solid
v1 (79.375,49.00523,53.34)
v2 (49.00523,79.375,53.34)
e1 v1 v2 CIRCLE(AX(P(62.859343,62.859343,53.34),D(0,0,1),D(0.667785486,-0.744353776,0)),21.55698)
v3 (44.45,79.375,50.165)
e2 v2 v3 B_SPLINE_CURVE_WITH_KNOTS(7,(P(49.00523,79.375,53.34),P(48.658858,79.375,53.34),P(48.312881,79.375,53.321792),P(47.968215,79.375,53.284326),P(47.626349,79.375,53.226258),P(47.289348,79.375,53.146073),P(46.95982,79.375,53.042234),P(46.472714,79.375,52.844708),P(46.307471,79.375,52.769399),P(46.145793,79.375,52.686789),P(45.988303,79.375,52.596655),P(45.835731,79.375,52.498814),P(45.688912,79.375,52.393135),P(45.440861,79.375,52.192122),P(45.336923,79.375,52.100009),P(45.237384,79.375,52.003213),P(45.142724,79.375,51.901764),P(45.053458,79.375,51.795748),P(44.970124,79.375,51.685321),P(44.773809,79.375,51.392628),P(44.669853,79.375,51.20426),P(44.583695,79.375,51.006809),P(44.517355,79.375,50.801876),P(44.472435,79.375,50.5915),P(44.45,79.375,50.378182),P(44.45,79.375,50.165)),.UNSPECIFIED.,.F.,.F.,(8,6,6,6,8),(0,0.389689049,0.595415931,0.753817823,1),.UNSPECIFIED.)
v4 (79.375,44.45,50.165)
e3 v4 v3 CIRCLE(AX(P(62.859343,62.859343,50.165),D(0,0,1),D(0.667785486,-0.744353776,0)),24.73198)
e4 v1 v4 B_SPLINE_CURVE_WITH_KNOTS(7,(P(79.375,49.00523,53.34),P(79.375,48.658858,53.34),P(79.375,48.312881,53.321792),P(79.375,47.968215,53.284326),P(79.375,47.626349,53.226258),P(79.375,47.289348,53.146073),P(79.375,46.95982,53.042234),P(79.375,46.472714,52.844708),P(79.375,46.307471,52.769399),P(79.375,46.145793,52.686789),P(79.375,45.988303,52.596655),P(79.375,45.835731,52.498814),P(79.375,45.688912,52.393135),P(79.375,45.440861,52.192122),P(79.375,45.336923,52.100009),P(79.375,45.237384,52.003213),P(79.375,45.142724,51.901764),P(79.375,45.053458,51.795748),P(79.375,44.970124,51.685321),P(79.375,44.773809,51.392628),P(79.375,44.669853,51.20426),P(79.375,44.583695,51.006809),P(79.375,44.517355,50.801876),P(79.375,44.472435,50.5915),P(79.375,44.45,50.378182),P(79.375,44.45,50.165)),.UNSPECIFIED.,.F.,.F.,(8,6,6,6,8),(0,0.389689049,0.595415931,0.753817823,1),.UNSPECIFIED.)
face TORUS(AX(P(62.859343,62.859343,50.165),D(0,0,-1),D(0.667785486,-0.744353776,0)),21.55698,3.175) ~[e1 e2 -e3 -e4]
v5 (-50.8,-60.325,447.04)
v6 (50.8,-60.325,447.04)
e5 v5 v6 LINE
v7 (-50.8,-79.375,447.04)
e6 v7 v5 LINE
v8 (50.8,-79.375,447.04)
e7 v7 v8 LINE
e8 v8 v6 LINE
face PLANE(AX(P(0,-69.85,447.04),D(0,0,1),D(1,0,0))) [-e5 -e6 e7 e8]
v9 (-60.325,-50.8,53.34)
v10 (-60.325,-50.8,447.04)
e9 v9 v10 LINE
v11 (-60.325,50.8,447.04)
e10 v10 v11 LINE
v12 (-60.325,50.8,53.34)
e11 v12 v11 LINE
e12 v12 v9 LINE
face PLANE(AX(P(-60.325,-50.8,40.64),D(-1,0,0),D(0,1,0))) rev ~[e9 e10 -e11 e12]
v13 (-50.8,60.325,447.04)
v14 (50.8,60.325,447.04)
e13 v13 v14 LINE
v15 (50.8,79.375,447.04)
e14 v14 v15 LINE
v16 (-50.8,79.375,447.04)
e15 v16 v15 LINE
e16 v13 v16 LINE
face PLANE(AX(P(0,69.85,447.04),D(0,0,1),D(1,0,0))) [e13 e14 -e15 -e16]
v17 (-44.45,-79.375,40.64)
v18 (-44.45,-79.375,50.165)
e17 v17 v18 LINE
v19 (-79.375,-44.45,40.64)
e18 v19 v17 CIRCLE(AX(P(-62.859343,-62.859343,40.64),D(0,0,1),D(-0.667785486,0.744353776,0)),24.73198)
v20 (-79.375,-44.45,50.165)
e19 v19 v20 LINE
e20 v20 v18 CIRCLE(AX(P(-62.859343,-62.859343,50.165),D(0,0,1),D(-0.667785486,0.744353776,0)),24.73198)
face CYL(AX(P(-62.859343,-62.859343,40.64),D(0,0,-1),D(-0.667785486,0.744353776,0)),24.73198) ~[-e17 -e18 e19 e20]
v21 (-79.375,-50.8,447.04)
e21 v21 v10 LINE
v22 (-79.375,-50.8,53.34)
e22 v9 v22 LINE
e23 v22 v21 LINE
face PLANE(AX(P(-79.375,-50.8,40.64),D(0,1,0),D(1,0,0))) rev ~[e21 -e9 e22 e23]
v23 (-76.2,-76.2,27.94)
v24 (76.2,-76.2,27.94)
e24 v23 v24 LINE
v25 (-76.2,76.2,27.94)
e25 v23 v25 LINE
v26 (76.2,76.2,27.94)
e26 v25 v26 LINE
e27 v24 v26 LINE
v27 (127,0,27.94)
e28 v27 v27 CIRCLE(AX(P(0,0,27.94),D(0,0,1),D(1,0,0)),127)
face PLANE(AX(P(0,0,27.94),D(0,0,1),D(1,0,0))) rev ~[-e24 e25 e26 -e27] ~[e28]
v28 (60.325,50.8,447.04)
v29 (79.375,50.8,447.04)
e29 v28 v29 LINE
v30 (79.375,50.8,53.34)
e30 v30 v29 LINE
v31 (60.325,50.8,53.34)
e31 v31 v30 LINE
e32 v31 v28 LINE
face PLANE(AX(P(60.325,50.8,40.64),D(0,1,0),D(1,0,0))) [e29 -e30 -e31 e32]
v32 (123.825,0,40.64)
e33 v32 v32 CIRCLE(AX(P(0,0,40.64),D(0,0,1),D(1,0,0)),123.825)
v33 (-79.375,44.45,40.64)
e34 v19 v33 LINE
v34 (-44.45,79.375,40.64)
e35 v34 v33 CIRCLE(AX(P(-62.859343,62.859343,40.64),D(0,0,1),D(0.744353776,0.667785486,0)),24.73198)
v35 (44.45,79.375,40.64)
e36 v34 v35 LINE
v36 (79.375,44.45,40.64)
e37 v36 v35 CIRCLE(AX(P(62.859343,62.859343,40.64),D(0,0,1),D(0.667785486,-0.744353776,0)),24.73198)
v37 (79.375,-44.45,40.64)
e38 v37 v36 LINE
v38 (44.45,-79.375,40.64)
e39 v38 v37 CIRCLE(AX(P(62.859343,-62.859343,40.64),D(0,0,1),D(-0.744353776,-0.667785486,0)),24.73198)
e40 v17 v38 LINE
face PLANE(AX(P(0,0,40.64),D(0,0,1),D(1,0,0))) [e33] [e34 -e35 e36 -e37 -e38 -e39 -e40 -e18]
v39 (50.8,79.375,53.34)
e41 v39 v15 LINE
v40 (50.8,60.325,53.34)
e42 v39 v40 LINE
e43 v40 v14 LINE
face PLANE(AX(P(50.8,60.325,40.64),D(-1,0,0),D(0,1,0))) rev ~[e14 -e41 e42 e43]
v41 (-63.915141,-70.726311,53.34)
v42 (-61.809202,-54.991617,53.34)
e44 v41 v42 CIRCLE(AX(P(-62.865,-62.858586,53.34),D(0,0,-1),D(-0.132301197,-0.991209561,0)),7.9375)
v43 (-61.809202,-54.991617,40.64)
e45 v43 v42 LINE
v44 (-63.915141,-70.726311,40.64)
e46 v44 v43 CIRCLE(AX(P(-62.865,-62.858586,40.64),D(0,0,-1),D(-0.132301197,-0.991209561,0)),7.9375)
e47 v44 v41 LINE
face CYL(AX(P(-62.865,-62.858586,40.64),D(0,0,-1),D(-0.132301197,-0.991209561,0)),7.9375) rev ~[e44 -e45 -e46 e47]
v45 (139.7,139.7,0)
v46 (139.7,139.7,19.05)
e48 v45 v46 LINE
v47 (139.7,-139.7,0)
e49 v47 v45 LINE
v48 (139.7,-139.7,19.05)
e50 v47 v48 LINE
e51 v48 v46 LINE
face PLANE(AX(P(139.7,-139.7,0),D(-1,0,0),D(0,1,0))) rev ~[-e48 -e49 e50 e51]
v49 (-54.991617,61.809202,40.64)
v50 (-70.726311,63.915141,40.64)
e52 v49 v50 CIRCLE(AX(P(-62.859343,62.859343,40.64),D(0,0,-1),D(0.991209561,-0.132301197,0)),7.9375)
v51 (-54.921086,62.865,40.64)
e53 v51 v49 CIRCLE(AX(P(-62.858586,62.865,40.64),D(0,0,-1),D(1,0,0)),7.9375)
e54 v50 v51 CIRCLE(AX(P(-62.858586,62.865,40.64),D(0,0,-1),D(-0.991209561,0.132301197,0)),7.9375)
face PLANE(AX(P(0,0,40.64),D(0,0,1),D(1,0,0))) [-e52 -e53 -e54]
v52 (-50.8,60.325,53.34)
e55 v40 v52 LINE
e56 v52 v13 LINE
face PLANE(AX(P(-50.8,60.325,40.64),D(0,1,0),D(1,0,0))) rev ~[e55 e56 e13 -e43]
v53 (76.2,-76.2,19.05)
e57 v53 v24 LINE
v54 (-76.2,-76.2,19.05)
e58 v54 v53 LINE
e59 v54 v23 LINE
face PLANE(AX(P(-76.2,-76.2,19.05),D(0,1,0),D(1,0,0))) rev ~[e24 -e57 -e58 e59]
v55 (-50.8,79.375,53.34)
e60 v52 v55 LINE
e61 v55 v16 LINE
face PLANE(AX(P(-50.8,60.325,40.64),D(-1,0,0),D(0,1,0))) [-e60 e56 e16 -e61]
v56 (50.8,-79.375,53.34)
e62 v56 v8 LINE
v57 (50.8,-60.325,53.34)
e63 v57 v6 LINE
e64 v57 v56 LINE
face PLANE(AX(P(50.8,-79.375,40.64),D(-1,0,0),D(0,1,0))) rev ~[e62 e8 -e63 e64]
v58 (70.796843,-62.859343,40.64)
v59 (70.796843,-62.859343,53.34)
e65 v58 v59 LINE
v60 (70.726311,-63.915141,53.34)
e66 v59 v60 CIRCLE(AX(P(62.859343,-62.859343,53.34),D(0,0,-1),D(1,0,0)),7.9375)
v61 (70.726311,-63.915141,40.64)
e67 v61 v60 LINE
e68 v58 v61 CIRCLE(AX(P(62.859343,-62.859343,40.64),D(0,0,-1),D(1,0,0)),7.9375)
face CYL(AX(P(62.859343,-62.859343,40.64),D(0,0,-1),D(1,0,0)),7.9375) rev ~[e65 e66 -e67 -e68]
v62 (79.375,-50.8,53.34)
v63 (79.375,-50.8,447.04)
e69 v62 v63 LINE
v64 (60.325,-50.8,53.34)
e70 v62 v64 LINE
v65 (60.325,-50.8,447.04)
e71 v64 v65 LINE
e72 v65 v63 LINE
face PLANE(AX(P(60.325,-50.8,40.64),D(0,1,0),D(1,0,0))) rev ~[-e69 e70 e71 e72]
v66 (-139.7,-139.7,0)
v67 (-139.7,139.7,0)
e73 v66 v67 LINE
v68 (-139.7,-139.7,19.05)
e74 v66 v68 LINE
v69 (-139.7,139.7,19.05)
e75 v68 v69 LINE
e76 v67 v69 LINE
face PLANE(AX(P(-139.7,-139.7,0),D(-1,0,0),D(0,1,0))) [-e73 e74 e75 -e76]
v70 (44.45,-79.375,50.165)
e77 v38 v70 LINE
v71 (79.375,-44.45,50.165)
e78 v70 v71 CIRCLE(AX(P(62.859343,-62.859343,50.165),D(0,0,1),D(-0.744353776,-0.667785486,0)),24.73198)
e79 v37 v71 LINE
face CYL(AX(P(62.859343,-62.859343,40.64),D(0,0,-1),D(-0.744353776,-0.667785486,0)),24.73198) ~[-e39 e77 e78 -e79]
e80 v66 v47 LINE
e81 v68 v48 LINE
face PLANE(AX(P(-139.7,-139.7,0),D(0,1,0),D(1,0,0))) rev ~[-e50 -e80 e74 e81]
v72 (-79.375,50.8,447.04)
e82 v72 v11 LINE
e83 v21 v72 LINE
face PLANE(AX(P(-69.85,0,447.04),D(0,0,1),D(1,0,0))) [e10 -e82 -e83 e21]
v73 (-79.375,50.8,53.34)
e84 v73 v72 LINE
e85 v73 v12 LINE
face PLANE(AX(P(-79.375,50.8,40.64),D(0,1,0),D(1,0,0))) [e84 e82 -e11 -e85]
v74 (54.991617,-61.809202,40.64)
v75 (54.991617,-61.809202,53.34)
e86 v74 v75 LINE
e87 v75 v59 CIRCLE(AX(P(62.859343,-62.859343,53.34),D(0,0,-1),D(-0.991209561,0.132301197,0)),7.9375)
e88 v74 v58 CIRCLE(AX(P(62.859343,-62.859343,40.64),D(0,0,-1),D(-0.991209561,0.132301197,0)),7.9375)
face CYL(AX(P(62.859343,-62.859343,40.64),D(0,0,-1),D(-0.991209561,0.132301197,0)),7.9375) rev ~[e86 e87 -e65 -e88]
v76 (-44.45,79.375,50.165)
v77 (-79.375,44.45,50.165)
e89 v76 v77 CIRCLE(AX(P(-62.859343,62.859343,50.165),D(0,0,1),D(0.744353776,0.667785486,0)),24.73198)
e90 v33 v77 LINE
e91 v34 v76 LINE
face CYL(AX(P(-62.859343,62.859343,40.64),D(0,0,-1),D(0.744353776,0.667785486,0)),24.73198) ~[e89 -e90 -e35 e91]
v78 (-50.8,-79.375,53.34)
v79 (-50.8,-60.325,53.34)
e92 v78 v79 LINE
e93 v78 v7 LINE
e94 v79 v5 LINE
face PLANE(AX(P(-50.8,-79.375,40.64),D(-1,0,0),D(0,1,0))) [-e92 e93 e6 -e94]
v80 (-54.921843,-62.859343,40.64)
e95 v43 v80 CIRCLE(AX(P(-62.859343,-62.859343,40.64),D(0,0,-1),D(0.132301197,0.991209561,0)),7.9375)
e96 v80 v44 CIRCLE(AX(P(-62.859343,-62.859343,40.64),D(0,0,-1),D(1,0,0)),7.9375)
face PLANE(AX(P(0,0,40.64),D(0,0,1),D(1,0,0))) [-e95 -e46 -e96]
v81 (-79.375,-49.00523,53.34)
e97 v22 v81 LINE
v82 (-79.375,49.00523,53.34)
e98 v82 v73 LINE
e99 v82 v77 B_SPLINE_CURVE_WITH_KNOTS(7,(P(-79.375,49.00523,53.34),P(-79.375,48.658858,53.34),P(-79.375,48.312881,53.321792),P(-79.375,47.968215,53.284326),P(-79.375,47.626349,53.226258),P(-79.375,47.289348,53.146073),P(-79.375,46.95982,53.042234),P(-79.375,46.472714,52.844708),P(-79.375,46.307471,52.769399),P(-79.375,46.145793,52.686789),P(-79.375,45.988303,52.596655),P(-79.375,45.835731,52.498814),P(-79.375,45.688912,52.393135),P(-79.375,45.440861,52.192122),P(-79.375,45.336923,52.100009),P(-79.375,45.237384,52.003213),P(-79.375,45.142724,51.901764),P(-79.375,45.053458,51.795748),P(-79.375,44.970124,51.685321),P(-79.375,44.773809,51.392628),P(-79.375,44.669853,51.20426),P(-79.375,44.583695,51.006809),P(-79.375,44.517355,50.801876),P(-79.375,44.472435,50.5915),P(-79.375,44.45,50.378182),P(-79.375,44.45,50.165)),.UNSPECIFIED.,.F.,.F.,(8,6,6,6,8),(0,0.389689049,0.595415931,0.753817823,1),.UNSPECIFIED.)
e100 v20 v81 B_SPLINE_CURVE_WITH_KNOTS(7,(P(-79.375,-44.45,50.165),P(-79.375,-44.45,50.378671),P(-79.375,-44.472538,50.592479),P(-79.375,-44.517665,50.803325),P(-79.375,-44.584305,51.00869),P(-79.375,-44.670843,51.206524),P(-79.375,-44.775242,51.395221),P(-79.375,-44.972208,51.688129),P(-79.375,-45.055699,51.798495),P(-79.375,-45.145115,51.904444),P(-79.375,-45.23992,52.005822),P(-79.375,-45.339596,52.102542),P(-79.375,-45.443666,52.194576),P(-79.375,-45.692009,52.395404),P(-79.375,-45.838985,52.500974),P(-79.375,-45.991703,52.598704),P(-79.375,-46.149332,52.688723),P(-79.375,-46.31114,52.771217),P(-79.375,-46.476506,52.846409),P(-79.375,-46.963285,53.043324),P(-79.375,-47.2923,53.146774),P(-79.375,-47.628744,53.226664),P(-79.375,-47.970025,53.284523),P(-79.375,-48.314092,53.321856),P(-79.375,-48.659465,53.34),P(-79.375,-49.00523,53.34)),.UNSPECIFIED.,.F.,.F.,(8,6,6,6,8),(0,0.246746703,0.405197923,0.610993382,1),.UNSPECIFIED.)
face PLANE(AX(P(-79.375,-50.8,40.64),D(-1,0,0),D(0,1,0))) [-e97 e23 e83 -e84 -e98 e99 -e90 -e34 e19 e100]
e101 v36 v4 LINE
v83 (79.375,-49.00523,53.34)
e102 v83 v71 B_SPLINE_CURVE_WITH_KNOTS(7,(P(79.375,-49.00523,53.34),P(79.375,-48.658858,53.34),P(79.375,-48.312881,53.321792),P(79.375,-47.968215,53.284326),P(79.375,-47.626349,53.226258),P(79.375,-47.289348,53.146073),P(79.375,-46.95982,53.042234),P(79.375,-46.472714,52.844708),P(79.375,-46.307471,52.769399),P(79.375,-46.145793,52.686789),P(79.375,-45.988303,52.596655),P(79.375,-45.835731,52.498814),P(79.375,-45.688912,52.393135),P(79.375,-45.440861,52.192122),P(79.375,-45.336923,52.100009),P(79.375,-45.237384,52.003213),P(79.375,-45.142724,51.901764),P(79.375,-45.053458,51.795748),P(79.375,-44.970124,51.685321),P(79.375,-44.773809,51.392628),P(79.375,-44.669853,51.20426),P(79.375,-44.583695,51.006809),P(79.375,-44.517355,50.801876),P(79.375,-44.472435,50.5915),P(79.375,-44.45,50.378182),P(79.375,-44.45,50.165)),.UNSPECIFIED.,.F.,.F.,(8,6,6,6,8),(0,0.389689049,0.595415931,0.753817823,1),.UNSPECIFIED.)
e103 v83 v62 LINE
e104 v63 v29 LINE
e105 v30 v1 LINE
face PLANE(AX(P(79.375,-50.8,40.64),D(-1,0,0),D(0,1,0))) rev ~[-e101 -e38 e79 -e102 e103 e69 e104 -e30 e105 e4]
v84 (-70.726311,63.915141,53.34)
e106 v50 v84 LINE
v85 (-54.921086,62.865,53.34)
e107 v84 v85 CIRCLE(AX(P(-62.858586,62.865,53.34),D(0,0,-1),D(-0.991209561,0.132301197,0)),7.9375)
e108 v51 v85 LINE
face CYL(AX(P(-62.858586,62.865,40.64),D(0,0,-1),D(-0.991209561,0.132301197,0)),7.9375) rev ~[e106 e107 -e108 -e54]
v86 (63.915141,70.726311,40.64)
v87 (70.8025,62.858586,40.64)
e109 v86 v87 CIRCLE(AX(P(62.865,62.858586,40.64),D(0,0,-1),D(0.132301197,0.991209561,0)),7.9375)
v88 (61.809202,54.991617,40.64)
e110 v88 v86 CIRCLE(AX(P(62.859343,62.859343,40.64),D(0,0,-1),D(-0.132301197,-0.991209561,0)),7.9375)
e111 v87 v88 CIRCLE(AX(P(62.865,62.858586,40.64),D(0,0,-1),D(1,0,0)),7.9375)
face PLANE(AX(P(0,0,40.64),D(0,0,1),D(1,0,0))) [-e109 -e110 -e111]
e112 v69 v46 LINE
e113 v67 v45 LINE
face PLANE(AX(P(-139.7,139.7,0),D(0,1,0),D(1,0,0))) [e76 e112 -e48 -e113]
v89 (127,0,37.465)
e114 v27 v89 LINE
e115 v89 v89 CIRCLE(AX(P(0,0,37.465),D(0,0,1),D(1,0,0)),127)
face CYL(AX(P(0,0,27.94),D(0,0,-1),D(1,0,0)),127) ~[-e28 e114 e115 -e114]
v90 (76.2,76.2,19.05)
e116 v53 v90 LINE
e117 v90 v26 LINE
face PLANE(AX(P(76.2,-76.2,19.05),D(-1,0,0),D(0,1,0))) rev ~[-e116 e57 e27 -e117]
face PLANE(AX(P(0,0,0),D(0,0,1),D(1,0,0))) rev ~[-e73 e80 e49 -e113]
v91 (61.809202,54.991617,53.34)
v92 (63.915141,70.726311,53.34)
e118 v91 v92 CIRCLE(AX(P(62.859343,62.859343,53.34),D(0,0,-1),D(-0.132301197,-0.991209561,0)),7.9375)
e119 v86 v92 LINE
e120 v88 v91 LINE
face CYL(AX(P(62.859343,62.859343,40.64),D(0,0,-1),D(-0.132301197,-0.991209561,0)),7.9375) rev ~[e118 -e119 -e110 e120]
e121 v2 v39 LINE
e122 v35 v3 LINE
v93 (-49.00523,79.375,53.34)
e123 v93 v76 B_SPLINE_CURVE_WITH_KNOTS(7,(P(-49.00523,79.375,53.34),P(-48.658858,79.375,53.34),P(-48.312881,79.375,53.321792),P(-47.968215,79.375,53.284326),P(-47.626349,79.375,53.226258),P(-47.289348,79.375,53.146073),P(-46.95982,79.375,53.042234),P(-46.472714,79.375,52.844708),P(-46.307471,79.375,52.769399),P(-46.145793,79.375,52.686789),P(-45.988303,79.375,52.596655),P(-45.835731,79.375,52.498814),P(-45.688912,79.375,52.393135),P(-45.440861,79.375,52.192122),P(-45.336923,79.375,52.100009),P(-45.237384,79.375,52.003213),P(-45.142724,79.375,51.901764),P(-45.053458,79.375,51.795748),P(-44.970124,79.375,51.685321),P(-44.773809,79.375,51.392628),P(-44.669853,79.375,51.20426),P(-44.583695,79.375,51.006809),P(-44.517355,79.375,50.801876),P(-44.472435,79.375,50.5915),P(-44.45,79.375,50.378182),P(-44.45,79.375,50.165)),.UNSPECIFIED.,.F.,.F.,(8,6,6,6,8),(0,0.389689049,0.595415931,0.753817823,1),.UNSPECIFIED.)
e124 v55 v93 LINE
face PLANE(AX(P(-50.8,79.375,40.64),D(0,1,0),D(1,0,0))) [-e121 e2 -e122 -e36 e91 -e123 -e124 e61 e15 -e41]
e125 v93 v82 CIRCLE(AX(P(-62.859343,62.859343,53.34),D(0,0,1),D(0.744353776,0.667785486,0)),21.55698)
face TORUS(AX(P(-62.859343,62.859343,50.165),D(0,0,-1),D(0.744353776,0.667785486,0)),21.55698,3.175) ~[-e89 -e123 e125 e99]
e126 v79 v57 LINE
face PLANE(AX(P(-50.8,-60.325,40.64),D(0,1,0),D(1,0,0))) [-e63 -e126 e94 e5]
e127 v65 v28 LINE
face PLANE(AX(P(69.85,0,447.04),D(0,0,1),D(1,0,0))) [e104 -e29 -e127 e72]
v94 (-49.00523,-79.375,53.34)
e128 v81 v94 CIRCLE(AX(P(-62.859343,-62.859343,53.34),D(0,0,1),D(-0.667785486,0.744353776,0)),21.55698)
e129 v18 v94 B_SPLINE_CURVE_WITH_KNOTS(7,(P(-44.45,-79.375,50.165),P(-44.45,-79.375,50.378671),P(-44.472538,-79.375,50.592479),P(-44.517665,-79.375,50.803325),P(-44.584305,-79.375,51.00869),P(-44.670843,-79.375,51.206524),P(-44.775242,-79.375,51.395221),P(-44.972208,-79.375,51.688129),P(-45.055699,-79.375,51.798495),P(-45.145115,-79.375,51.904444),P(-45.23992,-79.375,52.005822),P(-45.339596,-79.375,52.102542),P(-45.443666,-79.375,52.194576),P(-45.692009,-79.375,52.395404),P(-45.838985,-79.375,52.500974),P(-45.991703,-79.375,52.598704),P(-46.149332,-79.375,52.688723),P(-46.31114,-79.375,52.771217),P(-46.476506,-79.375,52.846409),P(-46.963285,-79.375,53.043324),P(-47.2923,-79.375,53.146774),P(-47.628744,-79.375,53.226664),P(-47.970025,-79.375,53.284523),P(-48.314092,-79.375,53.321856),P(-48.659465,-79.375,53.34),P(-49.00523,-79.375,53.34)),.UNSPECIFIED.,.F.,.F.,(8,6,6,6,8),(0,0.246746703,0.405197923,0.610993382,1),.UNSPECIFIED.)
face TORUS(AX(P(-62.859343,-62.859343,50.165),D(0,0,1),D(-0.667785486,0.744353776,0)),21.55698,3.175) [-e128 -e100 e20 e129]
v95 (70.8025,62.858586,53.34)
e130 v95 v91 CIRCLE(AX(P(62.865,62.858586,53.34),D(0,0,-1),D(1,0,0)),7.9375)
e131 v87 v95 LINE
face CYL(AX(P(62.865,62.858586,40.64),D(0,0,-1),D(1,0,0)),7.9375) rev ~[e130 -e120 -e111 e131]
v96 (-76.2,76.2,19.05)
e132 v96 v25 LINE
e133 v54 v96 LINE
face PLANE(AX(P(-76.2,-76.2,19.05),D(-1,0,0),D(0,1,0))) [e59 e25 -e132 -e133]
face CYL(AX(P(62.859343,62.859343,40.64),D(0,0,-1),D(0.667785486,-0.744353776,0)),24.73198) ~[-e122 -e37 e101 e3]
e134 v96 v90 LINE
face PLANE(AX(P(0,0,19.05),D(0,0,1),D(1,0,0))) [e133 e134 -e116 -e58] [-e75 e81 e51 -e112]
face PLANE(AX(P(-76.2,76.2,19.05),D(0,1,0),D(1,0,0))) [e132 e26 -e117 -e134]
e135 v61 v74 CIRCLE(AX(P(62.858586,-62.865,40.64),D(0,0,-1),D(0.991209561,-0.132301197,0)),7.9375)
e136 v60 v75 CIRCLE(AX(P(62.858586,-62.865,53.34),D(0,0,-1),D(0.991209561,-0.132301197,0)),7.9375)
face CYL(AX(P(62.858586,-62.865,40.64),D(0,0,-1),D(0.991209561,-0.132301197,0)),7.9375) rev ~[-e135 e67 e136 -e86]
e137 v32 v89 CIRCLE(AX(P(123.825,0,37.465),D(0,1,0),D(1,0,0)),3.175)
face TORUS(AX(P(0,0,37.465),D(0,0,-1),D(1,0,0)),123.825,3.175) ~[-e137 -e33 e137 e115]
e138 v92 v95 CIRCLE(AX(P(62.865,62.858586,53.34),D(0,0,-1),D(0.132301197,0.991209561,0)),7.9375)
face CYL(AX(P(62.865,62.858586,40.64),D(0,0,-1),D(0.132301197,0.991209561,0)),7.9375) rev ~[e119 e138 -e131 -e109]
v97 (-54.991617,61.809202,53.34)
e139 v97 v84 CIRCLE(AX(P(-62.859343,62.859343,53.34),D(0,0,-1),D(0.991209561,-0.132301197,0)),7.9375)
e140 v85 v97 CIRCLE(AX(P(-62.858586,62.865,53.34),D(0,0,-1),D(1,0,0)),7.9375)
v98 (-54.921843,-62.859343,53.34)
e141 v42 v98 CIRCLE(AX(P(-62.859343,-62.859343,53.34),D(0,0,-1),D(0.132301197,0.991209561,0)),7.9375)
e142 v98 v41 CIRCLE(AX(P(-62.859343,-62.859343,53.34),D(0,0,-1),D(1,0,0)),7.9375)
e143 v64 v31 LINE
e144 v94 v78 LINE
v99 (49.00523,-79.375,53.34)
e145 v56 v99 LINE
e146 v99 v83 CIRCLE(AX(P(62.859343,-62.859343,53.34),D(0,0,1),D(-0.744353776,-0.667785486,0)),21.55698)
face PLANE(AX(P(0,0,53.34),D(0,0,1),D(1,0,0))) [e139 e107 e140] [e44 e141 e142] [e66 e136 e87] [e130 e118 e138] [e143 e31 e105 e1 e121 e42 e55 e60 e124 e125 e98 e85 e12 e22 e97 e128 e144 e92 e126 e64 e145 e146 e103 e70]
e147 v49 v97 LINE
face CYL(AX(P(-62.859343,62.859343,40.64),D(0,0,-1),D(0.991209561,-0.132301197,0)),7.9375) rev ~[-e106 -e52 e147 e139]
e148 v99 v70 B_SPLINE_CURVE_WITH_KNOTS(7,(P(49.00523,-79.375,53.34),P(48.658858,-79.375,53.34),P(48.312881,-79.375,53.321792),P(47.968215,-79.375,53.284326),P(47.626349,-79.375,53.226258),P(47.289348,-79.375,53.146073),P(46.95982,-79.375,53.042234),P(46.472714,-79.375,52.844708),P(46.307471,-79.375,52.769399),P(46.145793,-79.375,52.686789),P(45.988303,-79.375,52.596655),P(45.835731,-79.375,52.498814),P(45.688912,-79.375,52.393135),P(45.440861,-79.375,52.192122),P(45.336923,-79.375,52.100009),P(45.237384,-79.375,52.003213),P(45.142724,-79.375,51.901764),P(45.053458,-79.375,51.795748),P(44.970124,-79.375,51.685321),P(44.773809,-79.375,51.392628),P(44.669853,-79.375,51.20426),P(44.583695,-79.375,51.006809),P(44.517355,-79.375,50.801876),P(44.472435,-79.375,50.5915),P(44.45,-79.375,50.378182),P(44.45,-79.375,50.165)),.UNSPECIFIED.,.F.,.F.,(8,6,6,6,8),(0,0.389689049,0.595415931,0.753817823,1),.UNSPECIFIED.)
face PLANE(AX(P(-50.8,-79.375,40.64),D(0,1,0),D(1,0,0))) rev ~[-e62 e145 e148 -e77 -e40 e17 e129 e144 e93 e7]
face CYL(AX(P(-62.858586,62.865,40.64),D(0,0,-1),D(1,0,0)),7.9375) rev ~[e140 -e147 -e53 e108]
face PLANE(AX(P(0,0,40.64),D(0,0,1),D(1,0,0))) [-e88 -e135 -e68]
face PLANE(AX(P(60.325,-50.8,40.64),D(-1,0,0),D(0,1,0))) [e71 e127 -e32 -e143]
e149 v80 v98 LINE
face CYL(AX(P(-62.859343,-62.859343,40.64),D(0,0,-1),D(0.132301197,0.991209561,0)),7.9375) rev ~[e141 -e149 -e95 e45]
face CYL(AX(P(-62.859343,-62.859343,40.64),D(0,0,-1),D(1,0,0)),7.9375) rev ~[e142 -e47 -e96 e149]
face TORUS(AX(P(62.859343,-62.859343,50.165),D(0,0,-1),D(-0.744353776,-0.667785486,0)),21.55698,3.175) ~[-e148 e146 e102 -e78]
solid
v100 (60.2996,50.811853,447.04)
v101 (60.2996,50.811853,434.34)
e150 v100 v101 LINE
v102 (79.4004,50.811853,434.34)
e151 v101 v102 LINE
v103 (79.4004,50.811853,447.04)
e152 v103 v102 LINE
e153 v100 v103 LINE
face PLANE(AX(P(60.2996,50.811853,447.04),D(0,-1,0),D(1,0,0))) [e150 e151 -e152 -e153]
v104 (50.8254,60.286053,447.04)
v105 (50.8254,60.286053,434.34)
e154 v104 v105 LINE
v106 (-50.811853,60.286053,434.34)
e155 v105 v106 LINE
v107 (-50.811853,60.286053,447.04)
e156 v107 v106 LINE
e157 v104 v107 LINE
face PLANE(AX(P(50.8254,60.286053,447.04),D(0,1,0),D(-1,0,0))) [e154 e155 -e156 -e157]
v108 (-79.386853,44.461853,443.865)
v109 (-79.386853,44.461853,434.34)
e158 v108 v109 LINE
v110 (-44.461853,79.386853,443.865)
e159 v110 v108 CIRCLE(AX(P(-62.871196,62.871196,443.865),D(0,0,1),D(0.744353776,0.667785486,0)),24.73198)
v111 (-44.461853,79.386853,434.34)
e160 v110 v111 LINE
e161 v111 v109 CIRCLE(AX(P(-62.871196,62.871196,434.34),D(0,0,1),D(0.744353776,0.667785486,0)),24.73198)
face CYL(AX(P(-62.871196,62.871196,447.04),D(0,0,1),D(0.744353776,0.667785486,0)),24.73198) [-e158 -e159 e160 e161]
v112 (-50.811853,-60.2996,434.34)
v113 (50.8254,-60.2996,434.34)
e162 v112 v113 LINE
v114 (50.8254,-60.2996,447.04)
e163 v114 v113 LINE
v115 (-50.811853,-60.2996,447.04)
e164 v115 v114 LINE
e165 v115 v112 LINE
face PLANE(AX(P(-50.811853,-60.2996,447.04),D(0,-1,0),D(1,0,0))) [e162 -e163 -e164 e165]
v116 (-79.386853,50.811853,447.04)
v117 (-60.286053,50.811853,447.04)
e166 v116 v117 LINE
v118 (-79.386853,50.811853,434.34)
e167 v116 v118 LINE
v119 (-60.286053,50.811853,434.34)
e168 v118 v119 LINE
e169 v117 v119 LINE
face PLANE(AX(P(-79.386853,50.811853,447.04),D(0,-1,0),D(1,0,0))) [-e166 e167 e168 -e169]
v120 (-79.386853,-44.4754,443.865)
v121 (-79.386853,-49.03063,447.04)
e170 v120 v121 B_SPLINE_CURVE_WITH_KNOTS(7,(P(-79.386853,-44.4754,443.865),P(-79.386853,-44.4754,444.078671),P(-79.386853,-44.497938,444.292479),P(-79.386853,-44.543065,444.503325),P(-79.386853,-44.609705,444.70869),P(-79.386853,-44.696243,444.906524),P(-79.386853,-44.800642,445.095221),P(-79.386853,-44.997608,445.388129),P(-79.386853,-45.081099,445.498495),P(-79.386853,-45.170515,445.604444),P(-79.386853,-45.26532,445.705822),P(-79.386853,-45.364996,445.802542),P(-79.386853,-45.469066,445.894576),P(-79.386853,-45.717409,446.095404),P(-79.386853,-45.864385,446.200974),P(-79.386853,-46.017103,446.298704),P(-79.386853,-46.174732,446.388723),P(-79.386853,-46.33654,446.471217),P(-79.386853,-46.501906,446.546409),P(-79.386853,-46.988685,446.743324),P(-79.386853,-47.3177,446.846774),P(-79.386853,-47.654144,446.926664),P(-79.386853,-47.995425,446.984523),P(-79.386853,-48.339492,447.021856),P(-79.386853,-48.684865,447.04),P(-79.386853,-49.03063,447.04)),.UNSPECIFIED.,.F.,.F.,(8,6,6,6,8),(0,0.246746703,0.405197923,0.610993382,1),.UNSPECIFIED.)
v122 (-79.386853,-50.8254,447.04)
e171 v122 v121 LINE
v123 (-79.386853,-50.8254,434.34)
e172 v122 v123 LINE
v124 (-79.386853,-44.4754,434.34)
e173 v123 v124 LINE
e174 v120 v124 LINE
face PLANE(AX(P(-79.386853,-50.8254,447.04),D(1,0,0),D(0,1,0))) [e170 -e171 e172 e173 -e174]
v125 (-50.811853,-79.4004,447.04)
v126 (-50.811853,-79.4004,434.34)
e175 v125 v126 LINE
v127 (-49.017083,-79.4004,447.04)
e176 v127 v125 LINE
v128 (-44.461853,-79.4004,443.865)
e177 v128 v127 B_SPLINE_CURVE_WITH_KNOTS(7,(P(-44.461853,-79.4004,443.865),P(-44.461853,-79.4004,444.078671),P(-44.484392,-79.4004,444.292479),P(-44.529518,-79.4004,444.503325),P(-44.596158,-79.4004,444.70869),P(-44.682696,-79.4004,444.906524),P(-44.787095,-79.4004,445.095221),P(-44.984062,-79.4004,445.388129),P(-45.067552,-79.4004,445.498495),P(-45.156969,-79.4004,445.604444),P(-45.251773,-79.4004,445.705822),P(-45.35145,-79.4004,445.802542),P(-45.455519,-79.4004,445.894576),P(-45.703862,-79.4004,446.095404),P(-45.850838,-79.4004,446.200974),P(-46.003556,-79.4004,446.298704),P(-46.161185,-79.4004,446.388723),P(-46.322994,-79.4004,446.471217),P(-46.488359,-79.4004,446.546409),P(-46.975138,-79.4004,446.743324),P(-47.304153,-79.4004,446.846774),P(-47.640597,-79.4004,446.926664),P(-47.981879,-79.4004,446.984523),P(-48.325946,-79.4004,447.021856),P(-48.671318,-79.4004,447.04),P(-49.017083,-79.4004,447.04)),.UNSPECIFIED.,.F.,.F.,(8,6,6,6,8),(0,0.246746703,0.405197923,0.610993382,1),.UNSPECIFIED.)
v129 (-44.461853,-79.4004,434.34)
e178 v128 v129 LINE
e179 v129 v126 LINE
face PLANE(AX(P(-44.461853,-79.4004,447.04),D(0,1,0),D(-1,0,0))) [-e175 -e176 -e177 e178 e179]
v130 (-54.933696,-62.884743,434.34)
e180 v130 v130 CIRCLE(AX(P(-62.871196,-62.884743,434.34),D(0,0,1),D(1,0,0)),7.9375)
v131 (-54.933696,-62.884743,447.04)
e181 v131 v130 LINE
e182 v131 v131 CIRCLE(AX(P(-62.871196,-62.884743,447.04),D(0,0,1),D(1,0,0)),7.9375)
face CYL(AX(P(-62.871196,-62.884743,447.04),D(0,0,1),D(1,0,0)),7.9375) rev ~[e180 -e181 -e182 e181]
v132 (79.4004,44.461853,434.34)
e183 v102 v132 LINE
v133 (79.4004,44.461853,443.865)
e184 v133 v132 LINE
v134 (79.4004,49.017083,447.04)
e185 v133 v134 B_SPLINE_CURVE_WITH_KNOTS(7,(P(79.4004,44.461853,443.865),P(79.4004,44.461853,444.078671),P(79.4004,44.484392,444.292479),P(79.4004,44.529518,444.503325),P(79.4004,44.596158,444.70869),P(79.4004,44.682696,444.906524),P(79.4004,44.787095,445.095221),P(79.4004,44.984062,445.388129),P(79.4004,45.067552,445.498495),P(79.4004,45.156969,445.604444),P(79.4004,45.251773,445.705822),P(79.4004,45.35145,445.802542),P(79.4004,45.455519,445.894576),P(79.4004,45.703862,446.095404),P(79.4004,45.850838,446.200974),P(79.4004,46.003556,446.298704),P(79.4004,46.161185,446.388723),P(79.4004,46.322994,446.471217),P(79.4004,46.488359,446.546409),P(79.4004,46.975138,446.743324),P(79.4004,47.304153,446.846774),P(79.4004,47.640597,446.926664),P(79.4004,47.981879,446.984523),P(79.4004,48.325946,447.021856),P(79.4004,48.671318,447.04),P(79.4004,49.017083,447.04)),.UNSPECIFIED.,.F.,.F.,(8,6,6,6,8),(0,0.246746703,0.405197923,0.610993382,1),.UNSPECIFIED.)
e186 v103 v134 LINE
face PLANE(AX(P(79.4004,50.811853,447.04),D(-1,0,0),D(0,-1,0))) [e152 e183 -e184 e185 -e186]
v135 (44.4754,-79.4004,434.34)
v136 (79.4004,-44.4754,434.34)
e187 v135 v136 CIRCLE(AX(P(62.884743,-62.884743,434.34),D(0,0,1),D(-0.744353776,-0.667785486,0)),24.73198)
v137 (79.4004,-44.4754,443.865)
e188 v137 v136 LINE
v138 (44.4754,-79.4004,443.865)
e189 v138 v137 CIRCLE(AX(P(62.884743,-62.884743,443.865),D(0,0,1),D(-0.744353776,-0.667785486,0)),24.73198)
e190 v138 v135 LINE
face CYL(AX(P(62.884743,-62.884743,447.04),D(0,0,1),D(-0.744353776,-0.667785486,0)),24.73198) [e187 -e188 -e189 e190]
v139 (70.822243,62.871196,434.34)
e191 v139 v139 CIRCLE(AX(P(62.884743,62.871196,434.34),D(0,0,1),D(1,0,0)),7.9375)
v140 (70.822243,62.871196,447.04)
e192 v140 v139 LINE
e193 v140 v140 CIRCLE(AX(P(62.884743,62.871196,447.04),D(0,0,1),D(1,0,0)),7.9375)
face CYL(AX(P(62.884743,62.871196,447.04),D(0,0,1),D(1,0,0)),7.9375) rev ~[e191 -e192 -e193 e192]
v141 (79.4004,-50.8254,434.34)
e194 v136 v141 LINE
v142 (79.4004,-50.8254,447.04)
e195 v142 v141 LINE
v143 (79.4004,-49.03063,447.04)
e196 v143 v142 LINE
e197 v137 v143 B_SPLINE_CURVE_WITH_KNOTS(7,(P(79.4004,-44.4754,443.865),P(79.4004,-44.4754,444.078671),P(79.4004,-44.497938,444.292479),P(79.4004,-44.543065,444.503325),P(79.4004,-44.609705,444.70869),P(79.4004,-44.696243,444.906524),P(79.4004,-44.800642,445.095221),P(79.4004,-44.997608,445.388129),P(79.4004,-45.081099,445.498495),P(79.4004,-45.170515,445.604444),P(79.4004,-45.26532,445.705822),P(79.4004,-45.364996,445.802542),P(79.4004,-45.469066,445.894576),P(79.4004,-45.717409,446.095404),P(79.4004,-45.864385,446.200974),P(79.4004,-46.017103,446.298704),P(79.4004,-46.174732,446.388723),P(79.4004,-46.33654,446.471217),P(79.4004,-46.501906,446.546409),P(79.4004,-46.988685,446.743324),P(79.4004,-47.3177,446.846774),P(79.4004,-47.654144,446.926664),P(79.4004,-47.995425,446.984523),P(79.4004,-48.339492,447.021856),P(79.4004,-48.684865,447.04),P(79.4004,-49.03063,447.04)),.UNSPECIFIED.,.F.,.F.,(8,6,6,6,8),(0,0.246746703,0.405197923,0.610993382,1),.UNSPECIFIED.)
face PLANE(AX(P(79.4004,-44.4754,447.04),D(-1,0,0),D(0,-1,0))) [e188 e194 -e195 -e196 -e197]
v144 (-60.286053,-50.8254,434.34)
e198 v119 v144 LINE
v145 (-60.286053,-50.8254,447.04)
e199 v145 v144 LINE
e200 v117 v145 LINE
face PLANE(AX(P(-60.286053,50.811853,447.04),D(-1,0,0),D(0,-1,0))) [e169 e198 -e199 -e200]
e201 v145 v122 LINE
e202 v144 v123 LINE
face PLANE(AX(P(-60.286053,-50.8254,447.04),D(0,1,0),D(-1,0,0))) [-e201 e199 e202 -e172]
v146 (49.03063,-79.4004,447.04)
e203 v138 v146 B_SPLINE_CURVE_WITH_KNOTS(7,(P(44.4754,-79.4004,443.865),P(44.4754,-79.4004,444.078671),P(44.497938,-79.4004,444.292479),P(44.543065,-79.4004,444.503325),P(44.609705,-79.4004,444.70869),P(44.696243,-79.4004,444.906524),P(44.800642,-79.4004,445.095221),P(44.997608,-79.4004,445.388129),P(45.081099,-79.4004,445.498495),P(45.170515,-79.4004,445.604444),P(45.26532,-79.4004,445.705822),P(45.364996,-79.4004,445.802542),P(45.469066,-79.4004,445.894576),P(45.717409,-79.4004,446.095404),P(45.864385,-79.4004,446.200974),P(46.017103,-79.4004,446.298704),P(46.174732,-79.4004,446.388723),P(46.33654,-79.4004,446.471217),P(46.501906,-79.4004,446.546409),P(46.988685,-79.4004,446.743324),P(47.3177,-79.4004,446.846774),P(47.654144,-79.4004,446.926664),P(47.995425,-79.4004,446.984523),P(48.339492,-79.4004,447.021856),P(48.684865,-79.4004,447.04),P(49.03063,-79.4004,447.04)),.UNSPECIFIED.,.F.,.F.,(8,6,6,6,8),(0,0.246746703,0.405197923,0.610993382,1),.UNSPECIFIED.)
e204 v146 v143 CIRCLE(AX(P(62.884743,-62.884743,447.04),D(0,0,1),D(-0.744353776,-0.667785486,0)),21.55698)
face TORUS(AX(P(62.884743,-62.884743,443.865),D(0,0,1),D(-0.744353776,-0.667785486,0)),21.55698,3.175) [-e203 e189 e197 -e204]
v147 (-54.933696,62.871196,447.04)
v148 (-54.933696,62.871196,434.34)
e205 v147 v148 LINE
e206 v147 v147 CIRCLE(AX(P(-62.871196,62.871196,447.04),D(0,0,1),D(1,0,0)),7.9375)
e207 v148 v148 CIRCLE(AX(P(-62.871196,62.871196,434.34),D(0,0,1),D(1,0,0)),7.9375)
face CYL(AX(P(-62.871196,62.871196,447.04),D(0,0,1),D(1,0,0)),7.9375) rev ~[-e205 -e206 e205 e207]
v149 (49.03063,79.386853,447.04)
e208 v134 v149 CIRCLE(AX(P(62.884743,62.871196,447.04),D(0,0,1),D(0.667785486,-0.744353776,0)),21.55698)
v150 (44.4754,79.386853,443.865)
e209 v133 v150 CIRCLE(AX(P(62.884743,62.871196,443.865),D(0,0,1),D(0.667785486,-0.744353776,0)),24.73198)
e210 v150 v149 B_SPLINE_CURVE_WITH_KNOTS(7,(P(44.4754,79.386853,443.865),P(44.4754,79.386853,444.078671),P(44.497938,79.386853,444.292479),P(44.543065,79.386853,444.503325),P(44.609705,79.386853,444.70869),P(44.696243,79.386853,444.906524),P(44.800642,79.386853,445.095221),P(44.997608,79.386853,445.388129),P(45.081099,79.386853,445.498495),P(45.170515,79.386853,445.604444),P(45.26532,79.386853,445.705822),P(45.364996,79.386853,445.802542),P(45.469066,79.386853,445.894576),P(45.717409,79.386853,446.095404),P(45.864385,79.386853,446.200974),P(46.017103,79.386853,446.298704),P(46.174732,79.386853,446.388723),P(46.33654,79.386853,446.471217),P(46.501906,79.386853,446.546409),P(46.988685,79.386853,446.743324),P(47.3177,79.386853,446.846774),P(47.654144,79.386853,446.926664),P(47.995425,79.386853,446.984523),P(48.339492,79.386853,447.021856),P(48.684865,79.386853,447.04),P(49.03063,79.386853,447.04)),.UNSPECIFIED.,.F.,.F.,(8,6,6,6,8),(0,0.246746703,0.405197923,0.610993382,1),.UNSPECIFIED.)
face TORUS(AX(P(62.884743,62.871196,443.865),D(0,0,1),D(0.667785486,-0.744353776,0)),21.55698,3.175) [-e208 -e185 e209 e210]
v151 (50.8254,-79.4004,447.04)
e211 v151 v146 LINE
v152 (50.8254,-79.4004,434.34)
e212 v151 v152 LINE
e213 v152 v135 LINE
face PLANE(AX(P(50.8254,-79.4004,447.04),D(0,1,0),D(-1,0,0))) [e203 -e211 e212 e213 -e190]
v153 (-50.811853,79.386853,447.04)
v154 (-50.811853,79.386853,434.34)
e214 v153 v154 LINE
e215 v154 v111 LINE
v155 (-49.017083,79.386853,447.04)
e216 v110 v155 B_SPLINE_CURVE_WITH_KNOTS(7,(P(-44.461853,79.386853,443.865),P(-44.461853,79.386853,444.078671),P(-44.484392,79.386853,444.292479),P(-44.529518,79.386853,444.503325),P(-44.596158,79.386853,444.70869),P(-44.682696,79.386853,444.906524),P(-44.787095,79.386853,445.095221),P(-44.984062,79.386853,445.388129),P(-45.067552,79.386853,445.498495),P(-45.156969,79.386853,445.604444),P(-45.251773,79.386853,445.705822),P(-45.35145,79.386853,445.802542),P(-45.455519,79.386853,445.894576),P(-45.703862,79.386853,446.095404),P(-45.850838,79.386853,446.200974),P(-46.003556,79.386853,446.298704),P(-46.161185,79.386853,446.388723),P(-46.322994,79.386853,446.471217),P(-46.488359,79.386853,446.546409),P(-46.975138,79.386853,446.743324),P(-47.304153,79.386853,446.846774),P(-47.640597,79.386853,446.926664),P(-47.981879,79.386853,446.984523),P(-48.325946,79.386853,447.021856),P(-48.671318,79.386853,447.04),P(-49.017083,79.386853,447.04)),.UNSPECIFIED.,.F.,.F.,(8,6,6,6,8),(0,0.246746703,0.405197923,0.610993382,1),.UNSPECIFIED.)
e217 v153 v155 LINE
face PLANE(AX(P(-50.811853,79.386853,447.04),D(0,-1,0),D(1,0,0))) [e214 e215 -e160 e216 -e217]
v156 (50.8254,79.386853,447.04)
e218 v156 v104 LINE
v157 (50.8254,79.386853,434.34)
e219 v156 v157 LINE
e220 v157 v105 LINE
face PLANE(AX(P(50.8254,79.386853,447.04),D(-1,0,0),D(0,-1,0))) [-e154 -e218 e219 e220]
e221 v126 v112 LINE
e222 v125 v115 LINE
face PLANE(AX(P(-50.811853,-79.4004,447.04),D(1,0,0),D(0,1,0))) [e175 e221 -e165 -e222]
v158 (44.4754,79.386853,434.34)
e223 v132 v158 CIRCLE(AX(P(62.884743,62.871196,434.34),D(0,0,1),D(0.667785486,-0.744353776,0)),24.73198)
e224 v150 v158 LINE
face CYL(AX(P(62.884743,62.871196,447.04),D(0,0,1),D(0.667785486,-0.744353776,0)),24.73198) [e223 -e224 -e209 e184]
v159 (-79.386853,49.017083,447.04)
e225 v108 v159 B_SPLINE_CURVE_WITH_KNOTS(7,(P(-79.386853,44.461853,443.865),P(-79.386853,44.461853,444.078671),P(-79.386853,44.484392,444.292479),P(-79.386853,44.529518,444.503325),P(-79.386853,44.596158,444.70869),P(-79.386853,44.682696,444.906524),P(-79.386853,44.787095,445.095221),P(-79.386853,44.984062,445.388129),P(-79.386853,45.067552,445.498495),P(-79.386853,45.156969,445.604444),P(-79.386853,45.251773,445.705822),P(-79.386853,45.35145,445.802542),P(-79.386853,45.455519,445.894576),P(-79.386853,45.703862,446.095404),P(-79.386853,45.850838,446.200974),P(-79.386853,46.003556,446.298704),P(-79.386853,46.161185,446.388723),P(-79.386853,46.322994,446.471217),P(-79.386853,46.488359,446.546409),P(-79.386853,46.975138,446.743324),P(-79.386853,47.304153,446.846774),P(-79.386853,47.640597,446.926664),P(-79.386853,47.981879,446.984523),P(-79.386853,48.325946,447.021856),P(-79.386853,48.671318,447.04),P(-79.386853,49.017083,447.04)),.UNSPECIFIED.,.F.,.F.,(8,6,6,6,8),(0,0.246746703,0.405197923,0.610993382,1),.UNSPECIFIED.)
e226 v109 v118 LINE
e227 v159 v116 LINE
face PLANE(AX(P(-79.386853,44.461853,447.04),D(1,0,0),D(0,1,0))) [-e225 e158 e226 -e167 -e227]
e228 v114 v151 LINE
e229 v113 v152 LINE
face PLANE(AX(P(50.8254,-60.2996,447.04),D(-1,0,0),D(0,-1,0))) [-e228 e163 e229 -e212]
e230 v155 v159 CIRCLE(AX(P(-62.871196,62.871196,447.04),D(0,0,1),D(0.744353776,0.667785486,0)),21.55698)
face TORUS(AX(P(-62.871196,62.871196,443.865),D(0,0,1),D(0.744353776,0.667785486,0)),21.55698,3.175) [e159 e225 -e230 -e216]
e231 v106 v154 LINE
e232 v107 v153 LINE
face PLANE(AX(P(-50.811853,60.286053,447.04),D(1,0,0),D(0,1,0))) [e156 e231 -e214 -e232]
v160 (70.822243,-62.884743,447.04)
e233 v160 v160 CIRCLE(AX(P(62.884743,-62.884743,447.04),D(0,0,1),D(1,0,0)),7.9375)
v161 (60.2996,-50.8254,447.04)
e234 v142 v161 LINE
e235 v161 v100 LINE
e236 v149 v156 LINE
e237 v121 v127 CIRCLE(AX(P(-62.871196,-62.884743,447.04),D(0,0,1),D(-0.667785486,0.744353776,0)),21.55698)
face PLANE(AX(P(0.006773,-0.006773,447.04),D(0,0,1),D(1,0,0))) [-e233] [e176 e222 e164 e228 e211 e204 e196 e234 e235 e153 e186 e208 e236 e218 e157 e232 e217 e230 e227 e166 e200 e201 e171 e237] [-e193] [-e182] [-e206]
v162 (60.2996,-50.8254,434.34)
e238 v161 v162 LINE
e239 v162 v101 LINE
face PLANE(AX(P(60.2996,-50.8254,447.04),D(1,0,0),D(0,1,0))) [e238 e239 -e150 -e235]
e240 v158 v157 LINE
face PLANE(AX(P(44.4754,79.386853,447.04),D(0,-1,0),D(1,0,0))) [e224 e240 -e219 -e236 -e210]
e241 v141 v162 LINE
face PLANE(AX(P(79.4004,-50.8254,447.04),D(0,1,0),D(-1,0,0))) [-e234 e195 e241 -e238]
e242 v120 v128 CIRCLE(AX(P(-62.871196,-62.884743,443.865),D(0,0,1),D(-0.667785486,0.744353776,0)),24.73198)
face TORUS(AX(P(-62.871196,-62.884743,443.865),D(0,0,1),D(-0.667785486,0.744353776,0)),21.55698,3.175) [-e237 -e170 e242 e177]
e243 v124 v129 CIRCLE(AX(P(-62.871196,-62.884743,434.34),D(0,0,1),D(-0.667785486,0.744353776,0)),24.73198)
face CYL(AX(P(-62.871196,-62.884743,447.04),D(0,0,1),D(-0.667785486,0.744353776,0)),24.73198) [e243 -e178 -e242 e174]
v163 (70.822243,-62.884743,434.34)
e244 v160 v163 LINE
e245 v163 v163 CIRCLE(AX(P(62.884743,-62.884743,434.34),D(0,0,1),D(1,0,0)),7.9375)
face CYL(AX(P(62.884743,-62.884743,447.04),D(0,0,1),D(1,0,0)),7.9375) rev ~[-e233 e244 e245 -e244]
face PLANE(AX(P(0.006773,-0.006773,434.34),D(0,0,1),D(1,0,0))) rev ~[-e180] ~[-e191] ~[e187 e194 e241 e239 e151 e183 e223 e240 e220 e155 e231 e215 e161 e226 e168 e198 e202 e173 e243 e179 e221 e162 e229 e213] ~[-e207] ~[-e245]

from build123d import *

# Parameters (mm, degrees)
F0_W      = 279.4
F0_H      = 279.4
F1_DEPTH  = 19.05
F2_W      = 152.4
F2_H      = 152.4
F3_DEPTH  = 8.89
F5_R      = 127
F6_DEPTH  = 12.7
F7_W      = 101.6
F7_H      = 19.05
F7_W_2    = 19.05
F7_H_2    = 101.6
F8_DEPTH  = 406.4
F21_DEPTH = 12.7
F22_R     = 3.175
F24_R     = 7.9375
F25_DEPTH = 12.7
F26_R     = 3.175
F27_R     = 3.175


# Not quite as in the source:
# - the program builds the solid bodies; features that only make, move or delete a surface that nothing else refers to are left out


with BuildPart() as f1:
    # F0 (on Top) → F1 (new body)
    with BuildSketch(Plane.XY):
        Rectangle(F0_W, F0_H)
    extrude(amount=F1_DEPTH)

    # F2 (on face) → F3 (join)
    with BuildSketch(Plane.XY.offset(19.05)):
        Rectangle(F2_W, F2_H)
    extrude(amount=F3_DEPTH)

    # F5 (on offset) → F6 (join)
    with BuildSketch(Plane.XY.offset(27.94)):
        Circle(F5_R)
    extrude(amount=F6_DEPTH)

    # F7 (on face) → F8 (join)
    with BuildSketch(Plane.XY.offset(40.64)):
        with Locations((0, -69.85)):
            Rectangle(F7_W, F7_H)
        with Locations((-69.85, 0)):
            Rectangle(F7_W_2, F7_H_2)
        with Locations((0, 69.85)):
            Rectangle(F7_W, F7_H)
        with Locations((69.85, 0)):
            Rectangle(F7_W_2, F7_H_2)
    extrude(amount=F8_DEPTH)

    # F20 (on face) → F21 (join)
    with BuildSketch(Plane.XY.offset(40.64)):
        with BuildLine():
            Line((-50.8, -60.325), (0, -60.325))
            Line((0, -60.325), (50.8, -60.325))
            Line((50.8, -60.325), (50.8, -79.375))
            Line((50.8, -79.375), (44.45, -79.375))
            ThreePointArc((44.45, -79.375), (80.3474934763, -80.3474934763), (79.375, -44.45))
            Line((79.375, -44.45), (79.375, -50.8))
            Line((79.375, -50.8), (60.325, -50.8))
            Line((60.325, -50.8), (60.325, 0))
            Line((60.325, 0), (60.325, 50.8))
            Line((60.325, 50.8), (79.375, 50.8))
            Line((79.375, 50.8), (79.375, 44.45))
            ThreePointArc((79.375, 44.45), (80.3474934763, 80.3474934763), (44.45, 79.375))
            Line((44.45, 79.375), (50.8, 79.375))
            Line((50.8, 79.375), (50.8, 60.325))
            Line((50.8, 60.325), (0, 60.325))
            Line((0, 60.325), (-50.8, 60.325))
            Line((-50.8, 60.325), (-50.8, 79.375))
            Line((-50.8, 79.375), (-44.45, 79.375))
            ThreePointArc((-44.45, 79.375), (-80.3474934763, 80.3474934763), (-79.375, 44.45))
            Line((-79.375, 44.45), (-79.375, 50.8))
            Line((-79.375, 50.8), (-60.325, 50.8))
            Line((-60.325, 50.8), (-60.325, 0))
            Line((-60.325, 0), (-60.325, -50.8))
            Line((-60.325, -50.8), (-79.375, -50.8))
            Line((-79.375, -50.8), (-79.375, -44.45))
            ThreePointArc((-79.375, -44.45), (-80.3474934763, -80.3474934763), (-44.45, -79.375))
            Line((-44.45, -79.375), (-50.8, -79.375))
            Line((-50.8, -79.375), (-50.8, -60.325))
        make_face()
        with BuildLine():
            ThreePointArc((-61.8092019554, -54.9916168178), (-56.8869311974, -57.6311301033), (-54.9218427062, -62.8593427062))
            ThreePointArc((-54.9218427062, -62.8593427062), (-57.6332777778, -68.8336335942), (-63.9151407508, -70.7263114196))
            ThreePointArc((-63.9151407508, -70.7263114196), (-70.7323478094, -61.8056160656), (-61.8092019554, -54.9916168178))
        make_face(mode=Mode.SUBTRACT)
        with BuildLine():
            ThreePointArc((54.9916168179, -61.8092019554), (63.3855707991, -54.9393054434), (70.7968427062, -62.8593427062))
            ThreePointArc((70.7968427062, -62.8593427062), (70.7791902556, -63.3884183561), (70.7263114196, -63.9151407508))
            ThreePointArc((70.7263114196, -63.9151407508), (61.8056160655, -70.7323478094), (54.9916168179, -61.8092019554))
        make_face(mode=Mode.SUBTRACT)
        with BuildLine():
            ThreePointArc((-54.9916168179, 61.8092019554), (-63.912312172, 54.9919948968), (-70.7263114196, 63.9151407508))
            ThreePointArc((-70.7263114196, 63.9151407508), (-62.3323574384, 70.7850372628), (-54.9210855313, 62.865))
            ThreePointArc((-54.9210855313, 62.865), (-54.9387379819, 62.3359243501), (-54.9916168179, 61.8092019554))
        make_face(mode=Mode.SUBTRACT)
        with BuildLine():
            ThreePointArc((61.8092019553, 54.9916168179), (54.9919948968, 63.912312172), (63.9151407508, 70.7263114196))
            ThreePointArc((63.9151407508, 70.7263114196), (68.8374115088, 68.0867981341), (70.8025, 62.8585855313))
            ThreePointArc((70.8025, 62.8585855313), (68.0910649283, 56.8842946433), (61.8092019553, 54.9916168179))
        make_face(mode=Mode.SUBTRACT)
    extrude(amount=F21_DEPTH)

    # F22
    f22_edges = [f1.edges().sort_by_distance(p)[0] for p in [
        (-80.347493, -80.347493, 53.34),
        (80.347493, -80.347493, 53.34),
        (80.347493, 80.347493, 53.34),
        (-80.347493, 80.347493, 53.34),
    ]]
    fillet(f22_edges, radius=F22_R)

    # F27
    f27_edges = [f1.edges().sort_by_distance(p)[0] for p in [
        (-127, 0, 40.64),
    ]]
    fillet(f27_edges, radius=F27_R)


with BuildPart() as f25:
    # F24 (on offset) → F25 (new body)
    with BuildSketch(Plane.XY.offset(447.04)):
        with BuildLine():
            Line((60.2996, -0.0135466667), (60.2996, 0))
            Line((60.2996, 0), (60.2996, 50.8118533333))
            Line((60.2996, 50.8118533333), (79.4004, 50.8118533333))
            Line((79.4004, 50.8118533333), (79.4004, 44.4618533333))
            ThreePointArc((79.4004, 44.4618533333), (80.3728934763, 80.3593468097), (44.4754, 79.3868533333))
            Line((44.4754, 79.3868533333), (50.8254, 79.3868533333))
            Line((50.8254, 79.3868533333), (50.8254, 60.2860533333))
            Line((50.8254, 60.2860533333), (0.0135466667, 60.2860533333))
            Line((0.0135466667, 60.2860533333), (0, 60.2860533333))
            Line((0, 60.2860533333), (-50.8118533333, 60.2860533333))
            Line((-50.8118533333, 60.2860533333), (-50.8118533333, 79.3868533333))
            Line((-50.8118533333, 79.3868533333), (-44.4618533333, 79.3868533333))
            ThreePointArc((-44.4618533333, 79.3868533333), (-80.3593468097, 80.3593468097), (-79.3868533333, 44.4618533333))
            Line((-79.3868533333, 44.4618533333), (-79.3868533333, 50.8118533333))
            Line((-79.3868533333, 50.8118533333), (-60.2860533333, 50.8118533333))
            Line((-60.2860533333, 50.8118533333), (-60.2860533333, 0))
            Line((-60.2860533333, 0), (-60.2860533333, -0.0135466667))
            Line((-60.2860533333, -0.0135466667), (-60.2860533333, -50.8254))
            Line((-60.2860533333, -50.8254), (-79.3868533333, -50.8254))
            Line((-79.3868533333, -50.8254), (-79.3868533333, -44.4754))
            ThreePointArc((-79.3868533333, -44.4754), (-80.3593468097, -80.3728934763), (-44.4618533333, -79.4004))
            Line((-44.4618533333, -79.4004), (-50.8118533333, -79.4004))
            Line((-50.8118533333, -79.4004), (-50.8118533333, -60.2996))
            Line((-50.8118533333, -60.2996), (0, -60.2996))
            Line((0, -60.2996), (0.0135466667, -60.2996))
            Line((0.0135466667, -60.2996), (50.8254, -60.2996))
            Line((50.8254, -60.2996), (50.8254, -79.4004))
            Line((50.8254, -79.4004), (44.4754, -79.4004))
            ThreePointArc((44.4754, -79.4004), (80.3728934763, -80.3728934763), (79.4004, -44.4754))
            Line((79.4004, -44.4754), (79.4004, -50.8254))
            Line((79.4004, -50.8254), (60.2996, -50.8254))
            Line((60.2996, -50.8254), (60.2996, -0.0135466667))
        make_face()
        with Locations((-62.8711960395, -62.8847427062)):
            Circle(F24_R, mode=Mode.SUBTRACT)
        with Locations((62.8847427062, -62.8847427062)):
            Circle(F24_R, mode=Mode.SUBTRACT)
        with Locations((-62.8711960395, 62.8711960395)):
            Circle(F24_R, mode=Mode.SUBTRACT)
        with Locations((62.8847427062, 62.8711960395)):
            Circle(F24_R, mode=Mode.SUBTRACT)
    extrude(amount=-F25_DEPTH)

    # F26
    f26_edges = [f25.edges().sort_by_distance(p)[0] for p in [
        (-80.359347, -80.372893, 447.04),
        (80.372893, -80.372893, 447.04),
        (80.372893, 80.359347, 447.04),
        (-80.359347, 80.359347, 447.04),
    ]]
    fillet(f26_edges, radius=F26_R)


solid = Compound([f1.part, f25.part])
